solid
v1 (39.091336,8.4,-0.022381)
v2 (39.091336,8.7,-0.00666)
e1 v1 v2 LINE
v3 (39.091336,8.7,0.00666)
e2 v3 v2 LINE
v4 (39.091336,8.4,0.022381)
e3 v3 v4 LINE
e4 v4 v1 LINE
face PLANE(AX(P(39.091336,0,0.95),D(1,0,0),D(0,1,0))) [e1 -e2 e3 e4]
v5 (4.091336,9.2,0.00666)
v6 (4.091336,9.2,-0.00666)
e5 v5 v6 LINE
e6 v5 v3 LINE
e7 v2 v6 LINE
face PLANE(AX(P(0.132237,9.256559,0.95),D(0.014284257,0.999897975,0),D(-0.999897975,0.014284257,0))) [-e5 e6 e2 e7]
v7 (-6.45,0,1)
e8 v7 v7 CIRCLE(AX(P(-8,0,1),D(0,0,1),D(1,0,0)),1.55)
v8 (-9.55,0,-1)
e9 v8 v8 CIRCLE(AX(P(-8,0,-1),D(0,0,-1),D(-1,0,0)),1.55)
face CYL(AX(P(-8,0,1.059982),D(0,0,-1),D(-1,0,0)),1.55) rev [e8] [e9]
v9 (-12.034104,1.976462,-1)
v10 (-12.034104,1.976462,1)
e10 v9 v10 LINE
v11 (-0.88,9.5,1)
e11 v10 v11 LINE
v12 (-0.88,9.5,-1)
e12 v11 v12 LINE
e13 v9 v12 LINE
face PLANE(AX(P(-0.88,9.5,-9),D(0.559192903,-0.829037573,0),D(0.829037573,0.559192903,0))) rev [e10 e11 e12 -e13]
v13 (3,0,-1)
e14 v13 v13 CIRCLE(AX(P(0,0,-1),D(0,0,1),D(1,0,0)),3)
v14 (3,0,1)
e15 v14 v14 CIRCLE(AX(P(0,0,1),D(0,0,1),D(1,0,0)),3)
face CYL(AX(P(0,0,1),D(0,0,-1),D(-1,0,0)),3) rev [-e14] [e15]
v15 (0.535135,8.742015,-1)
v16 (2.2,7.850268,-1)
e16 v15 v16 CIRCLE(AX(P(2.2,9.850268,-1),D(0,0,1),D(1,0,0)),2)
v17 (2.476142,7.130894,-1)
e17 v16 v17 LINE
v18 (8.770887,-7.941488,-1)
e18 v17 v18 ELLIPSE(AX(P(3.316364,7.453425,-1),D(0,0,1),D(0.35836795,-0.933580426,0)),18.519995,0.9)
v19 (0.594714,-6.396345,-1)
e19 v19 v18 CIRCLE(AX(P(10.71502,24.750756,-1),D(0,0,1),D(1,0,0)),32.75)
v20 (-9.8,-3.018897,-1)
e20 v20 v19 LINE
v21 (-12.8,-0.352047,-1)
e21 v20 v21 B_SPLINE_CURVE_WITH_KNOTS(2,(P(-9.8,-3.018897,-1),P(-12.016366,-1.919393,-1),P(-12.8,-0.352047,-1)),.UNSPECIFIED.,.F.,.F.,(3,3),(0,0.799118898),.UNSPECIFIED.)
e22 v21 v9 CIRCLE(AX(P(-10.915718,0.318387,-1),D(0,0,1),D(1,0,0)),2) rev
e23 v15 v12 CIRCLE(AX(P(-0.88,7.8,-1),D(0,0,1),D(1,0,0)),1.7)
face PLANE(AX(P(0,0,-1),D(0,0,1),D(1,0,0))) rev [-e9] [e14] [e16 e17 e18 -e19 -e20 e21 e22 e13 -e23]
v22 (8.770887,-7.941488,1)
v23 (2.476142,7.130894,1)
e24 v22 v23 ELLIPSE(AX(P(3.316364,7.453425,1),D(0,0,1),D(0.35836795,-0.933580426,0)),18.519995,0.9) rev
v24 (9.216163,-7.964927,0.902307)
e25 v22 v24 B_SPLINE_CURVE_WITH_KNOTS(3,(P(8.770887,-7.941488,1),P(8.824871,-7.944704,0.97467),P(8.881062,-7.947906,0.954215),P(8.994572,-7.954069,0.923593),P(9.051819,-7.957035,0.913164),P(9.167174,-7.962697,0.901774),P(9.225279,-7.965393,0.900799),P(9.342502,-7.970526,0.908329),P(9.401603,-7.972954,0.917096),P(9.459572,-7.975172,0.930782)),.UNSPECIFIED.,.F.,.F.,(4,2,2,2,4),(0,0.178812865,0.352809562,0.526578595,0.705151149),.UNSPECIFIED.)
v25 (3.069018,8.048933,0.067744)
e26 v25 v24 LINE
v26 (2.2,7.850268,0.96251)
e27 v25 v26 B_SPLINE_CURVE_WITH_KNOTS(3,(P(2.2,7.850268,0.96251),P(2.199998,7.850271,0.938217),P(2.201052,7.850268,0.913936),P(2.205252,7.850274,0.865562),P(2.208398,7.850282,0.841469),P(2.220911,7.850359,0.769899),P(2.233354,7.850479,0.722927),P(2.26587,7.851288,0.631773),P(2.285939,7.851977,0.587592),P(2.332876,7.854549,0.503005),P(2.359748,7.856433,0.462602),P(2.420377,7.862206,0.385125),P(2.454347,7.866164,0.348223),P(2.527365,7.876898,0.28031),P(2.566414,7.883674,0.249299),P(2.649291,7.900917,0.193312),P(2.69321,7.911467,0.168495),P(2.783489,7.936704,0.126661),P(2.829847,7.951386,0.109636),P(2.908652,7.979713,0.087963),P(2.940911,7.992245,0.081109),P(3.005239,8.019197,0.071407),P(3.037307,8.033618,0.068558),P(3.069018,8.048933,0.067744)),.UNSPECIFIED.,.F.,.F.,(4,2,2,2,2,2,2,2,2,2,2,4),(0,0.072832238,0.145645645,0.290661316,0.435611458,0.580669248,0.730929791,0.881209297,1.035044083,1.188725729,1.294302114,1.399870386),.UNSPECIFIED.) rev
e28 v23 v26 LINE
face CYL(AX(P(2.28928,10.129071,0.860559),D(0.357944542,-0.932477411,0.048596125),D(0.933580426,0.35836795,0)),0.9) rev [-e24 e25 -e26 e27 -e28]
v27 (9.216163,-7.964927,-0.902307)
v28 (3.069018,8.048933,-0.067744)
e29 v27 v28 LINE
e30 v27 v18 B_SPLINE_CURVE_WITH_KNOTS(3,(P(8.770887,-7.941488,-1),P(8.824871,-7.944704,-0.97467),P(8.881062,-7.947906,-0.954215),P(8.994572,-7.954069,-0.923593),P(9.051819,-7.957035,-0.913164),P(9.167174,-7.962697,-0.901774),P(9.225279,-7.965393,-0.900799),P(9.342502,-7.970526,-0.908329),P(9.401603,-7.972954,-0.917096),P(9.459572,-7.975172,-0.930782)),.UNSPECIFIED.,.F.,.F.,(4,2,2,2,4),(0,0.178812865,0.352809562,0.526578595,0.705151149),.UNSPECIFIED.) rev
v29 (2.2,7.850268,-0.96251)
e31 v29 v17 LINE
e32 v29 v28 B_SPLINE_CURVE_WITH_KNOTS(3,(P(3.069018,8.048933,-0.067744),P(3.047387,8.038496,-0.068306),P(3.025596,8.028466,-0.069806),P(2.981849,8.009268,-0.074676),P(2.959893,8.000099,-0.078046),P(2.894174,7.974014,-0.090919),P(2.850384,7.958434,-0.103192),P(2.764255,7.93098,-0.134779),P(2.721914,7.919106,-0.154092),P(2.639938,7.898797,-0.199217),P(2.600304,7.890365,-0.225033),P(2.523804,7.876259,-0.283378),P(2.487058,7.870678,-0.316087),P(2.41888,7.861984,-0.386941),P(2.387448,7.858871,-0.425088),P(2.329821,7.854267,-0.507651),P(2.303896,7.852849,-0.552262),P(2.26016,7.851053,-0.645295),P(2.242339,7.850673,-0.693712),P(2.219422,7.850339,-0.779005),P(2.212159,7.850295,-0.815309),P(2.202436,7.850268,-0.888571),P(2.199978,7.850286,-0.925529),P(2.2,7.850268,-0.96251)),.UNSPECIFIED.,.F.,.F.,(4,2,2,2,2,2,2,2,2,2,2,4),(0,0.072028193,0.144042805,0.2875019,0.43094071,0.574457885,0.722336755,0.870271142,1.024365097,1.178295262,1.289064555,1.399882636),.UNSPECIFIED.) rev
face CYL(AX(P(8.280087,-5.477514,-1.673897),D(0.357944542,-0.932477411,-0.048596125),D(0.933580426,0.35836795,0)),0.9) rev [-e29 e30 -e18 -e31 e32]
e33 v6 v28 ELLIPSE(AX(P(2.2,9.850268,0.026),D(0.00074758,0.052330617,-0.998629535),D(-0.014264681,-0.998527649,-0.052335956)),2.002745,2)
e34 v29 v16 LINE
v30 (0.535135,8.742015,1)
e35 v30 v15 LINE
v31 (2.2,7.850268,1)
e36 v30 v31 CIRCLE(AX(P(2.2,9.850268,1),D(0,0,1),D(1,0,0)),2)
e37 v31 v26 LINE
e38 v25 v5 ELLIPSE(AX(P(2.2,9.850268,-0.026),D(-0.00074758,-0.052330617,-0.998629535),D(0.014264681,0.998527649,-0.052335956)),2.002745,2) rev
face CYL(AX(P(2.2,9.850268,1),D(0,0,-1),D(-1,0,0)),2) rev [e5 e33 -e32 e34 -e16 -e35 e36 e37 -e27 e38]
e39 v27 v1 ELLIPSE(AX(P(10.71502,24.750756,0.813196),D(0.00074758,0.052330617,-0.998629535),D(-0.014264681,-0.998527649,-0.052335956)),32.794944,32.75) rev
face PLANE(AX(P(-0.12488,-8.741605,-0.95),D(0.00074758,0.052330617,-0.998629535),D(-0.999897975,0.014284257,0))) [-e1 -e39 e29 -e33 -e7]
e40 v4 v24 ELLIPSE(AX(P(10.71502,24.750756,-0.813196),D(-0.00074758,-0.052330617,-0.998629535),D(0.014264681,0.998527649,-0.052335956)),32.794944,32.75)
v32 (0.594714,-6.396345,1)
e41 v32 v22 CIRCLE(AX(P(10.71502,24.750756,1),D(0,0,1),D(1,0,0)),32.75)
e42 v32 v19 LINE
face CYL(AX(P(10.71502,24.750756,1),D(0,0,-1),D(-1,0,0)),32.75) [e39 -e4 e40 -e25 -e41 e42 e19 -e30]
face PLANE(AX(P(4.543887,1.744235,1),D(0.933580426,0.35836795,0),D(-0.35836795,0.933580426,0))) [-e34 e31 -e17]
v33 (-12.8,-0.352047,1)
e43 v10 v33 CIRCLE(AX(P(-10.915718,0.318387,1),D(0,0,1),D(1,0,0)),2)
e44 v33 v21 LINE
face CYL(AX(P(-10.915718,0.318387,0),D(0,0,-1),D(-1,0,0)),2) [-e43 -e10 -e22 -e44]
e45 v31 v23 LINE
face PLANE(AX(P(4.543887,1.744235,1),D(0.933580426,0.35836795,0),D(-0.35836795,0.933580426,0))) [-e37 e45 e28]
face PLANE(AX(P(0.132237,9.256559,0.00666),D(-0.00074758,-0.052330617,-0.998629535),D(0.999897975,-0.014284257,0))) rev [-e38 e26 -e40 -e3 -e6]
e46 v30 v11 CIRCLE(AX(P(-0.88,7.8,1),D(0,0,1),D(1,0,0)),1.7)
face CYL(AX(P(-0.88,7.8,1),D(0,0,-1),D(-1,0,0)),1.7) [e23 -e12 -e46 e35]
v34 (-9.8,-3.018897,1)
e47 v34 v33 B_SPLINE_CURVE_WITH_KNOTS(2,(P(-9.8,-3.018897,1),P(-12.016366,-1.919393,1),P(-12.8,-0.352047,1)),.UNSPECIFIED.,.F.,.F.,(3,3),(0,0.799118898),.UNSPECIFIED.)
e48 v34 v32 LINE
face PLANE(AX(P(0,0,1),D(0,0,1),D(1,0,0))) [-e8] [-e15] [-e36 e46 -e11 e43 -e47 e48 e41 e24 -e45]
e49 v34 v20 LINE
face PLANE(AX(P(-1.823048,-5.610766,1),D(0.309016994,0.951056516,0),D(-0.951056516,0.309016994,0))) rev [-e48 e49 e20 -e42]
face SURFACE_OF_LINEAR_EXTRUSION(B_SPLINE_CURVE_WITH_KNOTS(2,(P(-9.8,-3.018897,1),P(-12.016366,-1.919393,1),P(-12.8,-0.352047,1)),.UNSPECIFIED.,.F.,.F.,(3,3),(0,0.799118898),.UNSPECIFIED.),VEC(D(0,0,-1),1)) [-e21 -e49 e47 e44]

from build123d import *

# Parameters (mm, degrees)
SCHIZZO1_R                   = 3
ESTRUSIONE_ESTRUSIONE1_DEPTH = 1
ESTRUSIONE_ESTRUSIONE2_DEPTH = 0.95
SMUSSO1_SIZE                 = 18
SMUSSO1_SIZE_2               = 0.943340027
SMUSSO2_SIZE                 = 18
SMUSSO2_SIZE_2               = 0.943340027
RACCORDO1_R                  = 0.9
RACCORDO2_R                  = 0.9
TAGLIO_ESTRUSIONE1_DEPTH     = 10
RACCORDO3_R                  = 2
SCHIZZO3_R                   = 1.55
TAGLIO_ESTRUSIONE2_DEPTH     = 41.278810137


with BuildPart() as part:
    # Schizzo1 → Estrusione-Estrusione1 (new, symmetric)
    with BuildSketch(Plane.XY):
        with BuildLine():
            Line((-0.88, 9.5), (-19.130944839, 9.5))
            ThreePointArc((-19.130944839, 9.5), (-20.501263026, 8.610104965), (-20.245662077, 6.99630409))
            Line((-20.245662077, 6.99630409), (-15.960328698, 2.236959209))
            Line((-15.960328698, 2.236959209), (-14.839064722, 1.115695234))
            ThreePointArc((-14.839064722, 1.115695234), (-14.577677448, 0.895591951), (-14.282636649, 0.723197957))
            ThreePointArc((-14.282636649, 0.723197957), (-13.491665822, 0.254040408), (-12.8, -0.352047083))
            add(Edge.make_bspline(
                [(-9.8, -3.018897494), (-12.016366306, -1.919392636), (-12.8, -0.352047083)],
                knots=[0, 0, 0, 0.799118898, 0.799118898, 0.799118898], degree=2))
            Line((-9.8, -3.018897494), (0.594713885, -6.396344771))
            ThreePointArc((0.594713885, -6.396344771), (4.37641373, -7.379985604), (8.248348818, -7.906219091))
            Line((8.248348818, -7.906219091), (2.2, 7.850268275))
            ThreePointArc((2.2, 7.850268275), (1.255676497, 8.087244418), (0.535135135, 8.742015153))
            ThreePointArc((0.535135135, 8.742015153), (-0.077325022, 9.298570279), (-0.88, 9.5))
        make_face()
        Circle(SCHIZZO1_R, mode=Mode.SUBTRACT)
    extrude(amount=ESTRUSIONE_ESTRUSIONE1_DEPTH, both=True)

    # Schizzo1<4> → Estrusione-Estrusione2 (add, symmetric)
    with BuildSketch(Plane.XY):
        with BuildLine():
            ThreePointArc((4.091335816, 9.2), (3.361779551, 8.222303818), (2.2, 7.850268275))
            Line((2.2, 7.850268275), (8.248348818, -7.906219091))
            ThreePointArc((8.248348818, -7.906219091), (26.021901415, -4.20199667), (39.091335816, 8.4))
            Line((39.091335816, 8.4), (39.091335816, 8.7))
            Line((39.091335816, 8.7), (4.091335816, 9.2))
        make_face()
    extrude(amount=ESTRUSIONE_ESTRUSIONE2_DEPTH, both=True)

    # Smusso1
    # the kernel refuses this chamfer: 18, 0.943340027 mm, written as the material it takes off along each edge
    with BuildSketch(Plane(origin=(85.88418926, 8.031530665, 0.95), x_dir=(-0.01428422784103612, -0.9998959488725246, 0.002013023422382226), z_dir=(-0.99989797479951, 0.014284256782850195, 0))) as smusso1_piece_1_section:
        Polygon((SMUSSO1_SIZE * 0.999997973866, -SMUSSO1_SIZE * 0.00201302342238), (-SMUSSO1_SIZE_2 * 0.00201302342258, -SMUSSO1_SIZE_2 * 0.999997973967), (0, 0), align=None)
    smusso1_piece_1 = extrude(amount=128.598827208, mode=Mode.PRIVATE)
    smusso1_piece_1 = split(smusso1_piece_1, bisect_by=Plane(origin=(5.771356931, -1.453434613, 0.613202149), z_dir=(0.9335804264972009, 0.3583679495453028, 0)), keep=Keep.TOP, mode=Mode.PRIVATE)
    add(smusso1_piece_1, mode=Mode.SUBTRACT)

    # Smusso2
    # the kernel refuses this chamfer: 18, 0.943340027 mm, written as the material it takes off along each edge
    with BuildSketch(Plane(origin=(85.88418926, 8.031530665, -0.95), x_dir=(-0.01428422784103612, -0.9998959488725246, -0.002013023422382226), z_dir=(-0.99989797479951, 0.014284256782850195, 0))) as smusso2_piece_1_section:
        Polygon((SMUSSO2_SIZE * 0.999997973866, SMUSSO2_SIZE * 0.00201302342238), (-SMUSSO2_SIZE_2 * 0.00201302342258, SMUSSO2_SIZE_2 * 0.999997973967), (0, 0), align=None)
    smusso2_piece_1 = extrude(amount=128.598827208, mode=Mode.PRIVATE)
    smusso2_piece_1 = split(smusso2_piece_1, bisect_by=Plane(origin=(5.771356931, -1.453434613, -0.613202149), z_dir=(0.9335804264972009, 0.3583679495453028, 0)), keep=Keep.TOP, mode=Mode.PRIVATE)
    add(smusso2_piece_1, mode=Mode.SUBTRACT)

    # Raccordo1
    # the kernel refuses this fillet: 0.9 mm, written as the material it adds along each edge
    with BuildSketch(Plane(origin=(1.410141131, 9.907920978, -0.028429649), x_dir=(-0.017415293659521727, 0.04536839107084769, 0.9988185103603132), z_dir=(0.35794454152552274, -0.9324774108955555, 0.048596124964905896))) as raccordo1_piece_1_section:
        with BuildLine():
            CenterArc((RACCORDO1_R * 0.980734011967, -RACCORDO1_R), RACCORDO1_R, 90, 88.885438442)
            Line((-RACCORDO1_R * 0.0190767888902, -RACCORDO1_R * 0.980548457933), (0, 0))
            Line((0, 0), (RACCORDO1_R * 0.980734011967, 0))
        make_face()
    raccordo1_piece_1 = extrude(amount=21.310749772, mode=Mode.PRIVATE)
    raccordo1_piece_1 = raccordo1_piece_1 & Plane(origin=(10.715020451, 24.750756137, 0.600477284), x_dir=(-0.30901699437494573, -0.9510565162951542, 0), z_dir=(0, 0, 1)) * Cylinder(32.75, 47, mode=Mode.PRIVATE)
    raccordo1_piece_1 = split(raccordo1_piece_1, bisect_by=Plane(origin=(5.151176086, 0.789201867, 1), z_dir=(0, 0, -1)), keep=Keep.TOP, mode=Mode.PRIVATE)
    raccordo1_piece_1 = raccordo1_piece_1 - Plane(origin=(2.2, 9.850268275, 0.600477284), x_dir=(0, -1, 0), z_dir=(0, 0, 1)) * Cylinder(2, 47, mode=Mode.PRIVATE)
    add(raccordo1_piece_1)

    # Raccordo2
    # the kernel refuses this fillet: 0.9 mm, written as the material it adds along each edge
    with BuildSketch(Plane(origin=(1.410141131, 9.907920978, 0.028429649), x_dir=(-0.017415293659511128, 0.04536839107085176, -0.9988185103603133), z_dir=(0.35794454152552274, -0.9324774108955555, -0.048596124964905896))) as raccordo2_piece_1_section:
        with BuildLine():
            CenterArc((RACCORDO2_R * 0.980734011967, RACCORDO2_R), RACCORDO2_R, 181.114561558, 88.885438442)
            Line((-RACCORDO2_R * 0.0190767888902, RACCORDO2_R * 0.980548457933), (0, 0))
            Line((0, 0), (RACCORDO2_R * 0.980734011967, 0))
        make_face()
    raccordo2_piece_1 = extrude(amount=21.310749772, mode=Mode.PRIVATE)
    raccordo2_piece_1 = split(raccordo2_piece_1, bisect_by=Plane(origin=(5.151178194, 0.789195879, -1), z_dir=(0, 0, 1)), keep=Keep.TOP, mode=Mode.PRIVATE)
    raccordo2_piece_1 = raccordo2_piece_1 & Plane(origin=(10.715020451, 24.750756137, -0.600477223), x_dir=(-0.3090169943750401, -0.9510565162951234, 0), z_dir=(0, 0, 1)) * Cylinder(32.75, 47, mode=Mode.PRIVATE)
    raccordo2_piece_1 = raccordo2_piece_1 - Plane(origin=(2.2, 9.850268275, -0.600477223), x_dir=(0, -1, 0), z_dir=(0, 0, 1)) * Cylinder(2, 47, mode=Mode.PRIVATE)
    add(raccordo2_piece_1)

    # Schizzo2 → Taglio-Estrusione1 (cut)
    with BuildSketch(Plane.XY.offset(1)):
        Polygon((-0.88, 9.5), (-30.88, -10.735255505), (-30.88, 9.5), align=None)
    extrude(amount=-TAGLIO_ESTRUSIONE1_DEPTH, mode=Mode.SUBTRACT)

    # Raccordo3
    # the kernel refuses this fillet: 2 mm, written as the material it takes off along each edge
    with BuildSketch(Plane(origin=(-14.059482684, 0.610326682, -7.107620692), x_dir=(0.7945891525397701, -0.6071474933375991, 0), z_dir=(0, 0, 1))) as raccordo3_piece_1:
        with BuildLine():
            CenterArc((2.675251835, 1.676756542), RACCORDO3_R, 161.383532721, 75.585730468)
            Line((0.779898436, 2.315219927), (0.741991368, 2.327989195))
            Line((0.741991368, 2.327989195), (-0.037907068, 0.012769268))
            Line((-0.037907068, 0.012769268), (0.006340296, -0.039494312))
            ThreePointArc((0.006340296, -0.039494312), (0.792537049, 0.023211061), (1.563270543, -0.033535131))
            Line((1.563270543, -0.033535131), (1.585074098, 0))
        make_face()
    extrude(amount=14.215241383, mode=Mode.SUBTRACT)

    # Schizzo3 → Taglio-Estrusione2 (cut, through all)
    with BuildSketch(Plane(origin=(0, 0, -1), x_dir=(-1, 0, 0), z_dir=(0, 0, -1))):
        with Locations((8, 0)):
            Circle(SCHIZZO3_R)
    extrude(amount=-TAGLIO_ESTRUSIONE2_DEPTH, mode=Mode.SUBTRACT)


solid = part.part
